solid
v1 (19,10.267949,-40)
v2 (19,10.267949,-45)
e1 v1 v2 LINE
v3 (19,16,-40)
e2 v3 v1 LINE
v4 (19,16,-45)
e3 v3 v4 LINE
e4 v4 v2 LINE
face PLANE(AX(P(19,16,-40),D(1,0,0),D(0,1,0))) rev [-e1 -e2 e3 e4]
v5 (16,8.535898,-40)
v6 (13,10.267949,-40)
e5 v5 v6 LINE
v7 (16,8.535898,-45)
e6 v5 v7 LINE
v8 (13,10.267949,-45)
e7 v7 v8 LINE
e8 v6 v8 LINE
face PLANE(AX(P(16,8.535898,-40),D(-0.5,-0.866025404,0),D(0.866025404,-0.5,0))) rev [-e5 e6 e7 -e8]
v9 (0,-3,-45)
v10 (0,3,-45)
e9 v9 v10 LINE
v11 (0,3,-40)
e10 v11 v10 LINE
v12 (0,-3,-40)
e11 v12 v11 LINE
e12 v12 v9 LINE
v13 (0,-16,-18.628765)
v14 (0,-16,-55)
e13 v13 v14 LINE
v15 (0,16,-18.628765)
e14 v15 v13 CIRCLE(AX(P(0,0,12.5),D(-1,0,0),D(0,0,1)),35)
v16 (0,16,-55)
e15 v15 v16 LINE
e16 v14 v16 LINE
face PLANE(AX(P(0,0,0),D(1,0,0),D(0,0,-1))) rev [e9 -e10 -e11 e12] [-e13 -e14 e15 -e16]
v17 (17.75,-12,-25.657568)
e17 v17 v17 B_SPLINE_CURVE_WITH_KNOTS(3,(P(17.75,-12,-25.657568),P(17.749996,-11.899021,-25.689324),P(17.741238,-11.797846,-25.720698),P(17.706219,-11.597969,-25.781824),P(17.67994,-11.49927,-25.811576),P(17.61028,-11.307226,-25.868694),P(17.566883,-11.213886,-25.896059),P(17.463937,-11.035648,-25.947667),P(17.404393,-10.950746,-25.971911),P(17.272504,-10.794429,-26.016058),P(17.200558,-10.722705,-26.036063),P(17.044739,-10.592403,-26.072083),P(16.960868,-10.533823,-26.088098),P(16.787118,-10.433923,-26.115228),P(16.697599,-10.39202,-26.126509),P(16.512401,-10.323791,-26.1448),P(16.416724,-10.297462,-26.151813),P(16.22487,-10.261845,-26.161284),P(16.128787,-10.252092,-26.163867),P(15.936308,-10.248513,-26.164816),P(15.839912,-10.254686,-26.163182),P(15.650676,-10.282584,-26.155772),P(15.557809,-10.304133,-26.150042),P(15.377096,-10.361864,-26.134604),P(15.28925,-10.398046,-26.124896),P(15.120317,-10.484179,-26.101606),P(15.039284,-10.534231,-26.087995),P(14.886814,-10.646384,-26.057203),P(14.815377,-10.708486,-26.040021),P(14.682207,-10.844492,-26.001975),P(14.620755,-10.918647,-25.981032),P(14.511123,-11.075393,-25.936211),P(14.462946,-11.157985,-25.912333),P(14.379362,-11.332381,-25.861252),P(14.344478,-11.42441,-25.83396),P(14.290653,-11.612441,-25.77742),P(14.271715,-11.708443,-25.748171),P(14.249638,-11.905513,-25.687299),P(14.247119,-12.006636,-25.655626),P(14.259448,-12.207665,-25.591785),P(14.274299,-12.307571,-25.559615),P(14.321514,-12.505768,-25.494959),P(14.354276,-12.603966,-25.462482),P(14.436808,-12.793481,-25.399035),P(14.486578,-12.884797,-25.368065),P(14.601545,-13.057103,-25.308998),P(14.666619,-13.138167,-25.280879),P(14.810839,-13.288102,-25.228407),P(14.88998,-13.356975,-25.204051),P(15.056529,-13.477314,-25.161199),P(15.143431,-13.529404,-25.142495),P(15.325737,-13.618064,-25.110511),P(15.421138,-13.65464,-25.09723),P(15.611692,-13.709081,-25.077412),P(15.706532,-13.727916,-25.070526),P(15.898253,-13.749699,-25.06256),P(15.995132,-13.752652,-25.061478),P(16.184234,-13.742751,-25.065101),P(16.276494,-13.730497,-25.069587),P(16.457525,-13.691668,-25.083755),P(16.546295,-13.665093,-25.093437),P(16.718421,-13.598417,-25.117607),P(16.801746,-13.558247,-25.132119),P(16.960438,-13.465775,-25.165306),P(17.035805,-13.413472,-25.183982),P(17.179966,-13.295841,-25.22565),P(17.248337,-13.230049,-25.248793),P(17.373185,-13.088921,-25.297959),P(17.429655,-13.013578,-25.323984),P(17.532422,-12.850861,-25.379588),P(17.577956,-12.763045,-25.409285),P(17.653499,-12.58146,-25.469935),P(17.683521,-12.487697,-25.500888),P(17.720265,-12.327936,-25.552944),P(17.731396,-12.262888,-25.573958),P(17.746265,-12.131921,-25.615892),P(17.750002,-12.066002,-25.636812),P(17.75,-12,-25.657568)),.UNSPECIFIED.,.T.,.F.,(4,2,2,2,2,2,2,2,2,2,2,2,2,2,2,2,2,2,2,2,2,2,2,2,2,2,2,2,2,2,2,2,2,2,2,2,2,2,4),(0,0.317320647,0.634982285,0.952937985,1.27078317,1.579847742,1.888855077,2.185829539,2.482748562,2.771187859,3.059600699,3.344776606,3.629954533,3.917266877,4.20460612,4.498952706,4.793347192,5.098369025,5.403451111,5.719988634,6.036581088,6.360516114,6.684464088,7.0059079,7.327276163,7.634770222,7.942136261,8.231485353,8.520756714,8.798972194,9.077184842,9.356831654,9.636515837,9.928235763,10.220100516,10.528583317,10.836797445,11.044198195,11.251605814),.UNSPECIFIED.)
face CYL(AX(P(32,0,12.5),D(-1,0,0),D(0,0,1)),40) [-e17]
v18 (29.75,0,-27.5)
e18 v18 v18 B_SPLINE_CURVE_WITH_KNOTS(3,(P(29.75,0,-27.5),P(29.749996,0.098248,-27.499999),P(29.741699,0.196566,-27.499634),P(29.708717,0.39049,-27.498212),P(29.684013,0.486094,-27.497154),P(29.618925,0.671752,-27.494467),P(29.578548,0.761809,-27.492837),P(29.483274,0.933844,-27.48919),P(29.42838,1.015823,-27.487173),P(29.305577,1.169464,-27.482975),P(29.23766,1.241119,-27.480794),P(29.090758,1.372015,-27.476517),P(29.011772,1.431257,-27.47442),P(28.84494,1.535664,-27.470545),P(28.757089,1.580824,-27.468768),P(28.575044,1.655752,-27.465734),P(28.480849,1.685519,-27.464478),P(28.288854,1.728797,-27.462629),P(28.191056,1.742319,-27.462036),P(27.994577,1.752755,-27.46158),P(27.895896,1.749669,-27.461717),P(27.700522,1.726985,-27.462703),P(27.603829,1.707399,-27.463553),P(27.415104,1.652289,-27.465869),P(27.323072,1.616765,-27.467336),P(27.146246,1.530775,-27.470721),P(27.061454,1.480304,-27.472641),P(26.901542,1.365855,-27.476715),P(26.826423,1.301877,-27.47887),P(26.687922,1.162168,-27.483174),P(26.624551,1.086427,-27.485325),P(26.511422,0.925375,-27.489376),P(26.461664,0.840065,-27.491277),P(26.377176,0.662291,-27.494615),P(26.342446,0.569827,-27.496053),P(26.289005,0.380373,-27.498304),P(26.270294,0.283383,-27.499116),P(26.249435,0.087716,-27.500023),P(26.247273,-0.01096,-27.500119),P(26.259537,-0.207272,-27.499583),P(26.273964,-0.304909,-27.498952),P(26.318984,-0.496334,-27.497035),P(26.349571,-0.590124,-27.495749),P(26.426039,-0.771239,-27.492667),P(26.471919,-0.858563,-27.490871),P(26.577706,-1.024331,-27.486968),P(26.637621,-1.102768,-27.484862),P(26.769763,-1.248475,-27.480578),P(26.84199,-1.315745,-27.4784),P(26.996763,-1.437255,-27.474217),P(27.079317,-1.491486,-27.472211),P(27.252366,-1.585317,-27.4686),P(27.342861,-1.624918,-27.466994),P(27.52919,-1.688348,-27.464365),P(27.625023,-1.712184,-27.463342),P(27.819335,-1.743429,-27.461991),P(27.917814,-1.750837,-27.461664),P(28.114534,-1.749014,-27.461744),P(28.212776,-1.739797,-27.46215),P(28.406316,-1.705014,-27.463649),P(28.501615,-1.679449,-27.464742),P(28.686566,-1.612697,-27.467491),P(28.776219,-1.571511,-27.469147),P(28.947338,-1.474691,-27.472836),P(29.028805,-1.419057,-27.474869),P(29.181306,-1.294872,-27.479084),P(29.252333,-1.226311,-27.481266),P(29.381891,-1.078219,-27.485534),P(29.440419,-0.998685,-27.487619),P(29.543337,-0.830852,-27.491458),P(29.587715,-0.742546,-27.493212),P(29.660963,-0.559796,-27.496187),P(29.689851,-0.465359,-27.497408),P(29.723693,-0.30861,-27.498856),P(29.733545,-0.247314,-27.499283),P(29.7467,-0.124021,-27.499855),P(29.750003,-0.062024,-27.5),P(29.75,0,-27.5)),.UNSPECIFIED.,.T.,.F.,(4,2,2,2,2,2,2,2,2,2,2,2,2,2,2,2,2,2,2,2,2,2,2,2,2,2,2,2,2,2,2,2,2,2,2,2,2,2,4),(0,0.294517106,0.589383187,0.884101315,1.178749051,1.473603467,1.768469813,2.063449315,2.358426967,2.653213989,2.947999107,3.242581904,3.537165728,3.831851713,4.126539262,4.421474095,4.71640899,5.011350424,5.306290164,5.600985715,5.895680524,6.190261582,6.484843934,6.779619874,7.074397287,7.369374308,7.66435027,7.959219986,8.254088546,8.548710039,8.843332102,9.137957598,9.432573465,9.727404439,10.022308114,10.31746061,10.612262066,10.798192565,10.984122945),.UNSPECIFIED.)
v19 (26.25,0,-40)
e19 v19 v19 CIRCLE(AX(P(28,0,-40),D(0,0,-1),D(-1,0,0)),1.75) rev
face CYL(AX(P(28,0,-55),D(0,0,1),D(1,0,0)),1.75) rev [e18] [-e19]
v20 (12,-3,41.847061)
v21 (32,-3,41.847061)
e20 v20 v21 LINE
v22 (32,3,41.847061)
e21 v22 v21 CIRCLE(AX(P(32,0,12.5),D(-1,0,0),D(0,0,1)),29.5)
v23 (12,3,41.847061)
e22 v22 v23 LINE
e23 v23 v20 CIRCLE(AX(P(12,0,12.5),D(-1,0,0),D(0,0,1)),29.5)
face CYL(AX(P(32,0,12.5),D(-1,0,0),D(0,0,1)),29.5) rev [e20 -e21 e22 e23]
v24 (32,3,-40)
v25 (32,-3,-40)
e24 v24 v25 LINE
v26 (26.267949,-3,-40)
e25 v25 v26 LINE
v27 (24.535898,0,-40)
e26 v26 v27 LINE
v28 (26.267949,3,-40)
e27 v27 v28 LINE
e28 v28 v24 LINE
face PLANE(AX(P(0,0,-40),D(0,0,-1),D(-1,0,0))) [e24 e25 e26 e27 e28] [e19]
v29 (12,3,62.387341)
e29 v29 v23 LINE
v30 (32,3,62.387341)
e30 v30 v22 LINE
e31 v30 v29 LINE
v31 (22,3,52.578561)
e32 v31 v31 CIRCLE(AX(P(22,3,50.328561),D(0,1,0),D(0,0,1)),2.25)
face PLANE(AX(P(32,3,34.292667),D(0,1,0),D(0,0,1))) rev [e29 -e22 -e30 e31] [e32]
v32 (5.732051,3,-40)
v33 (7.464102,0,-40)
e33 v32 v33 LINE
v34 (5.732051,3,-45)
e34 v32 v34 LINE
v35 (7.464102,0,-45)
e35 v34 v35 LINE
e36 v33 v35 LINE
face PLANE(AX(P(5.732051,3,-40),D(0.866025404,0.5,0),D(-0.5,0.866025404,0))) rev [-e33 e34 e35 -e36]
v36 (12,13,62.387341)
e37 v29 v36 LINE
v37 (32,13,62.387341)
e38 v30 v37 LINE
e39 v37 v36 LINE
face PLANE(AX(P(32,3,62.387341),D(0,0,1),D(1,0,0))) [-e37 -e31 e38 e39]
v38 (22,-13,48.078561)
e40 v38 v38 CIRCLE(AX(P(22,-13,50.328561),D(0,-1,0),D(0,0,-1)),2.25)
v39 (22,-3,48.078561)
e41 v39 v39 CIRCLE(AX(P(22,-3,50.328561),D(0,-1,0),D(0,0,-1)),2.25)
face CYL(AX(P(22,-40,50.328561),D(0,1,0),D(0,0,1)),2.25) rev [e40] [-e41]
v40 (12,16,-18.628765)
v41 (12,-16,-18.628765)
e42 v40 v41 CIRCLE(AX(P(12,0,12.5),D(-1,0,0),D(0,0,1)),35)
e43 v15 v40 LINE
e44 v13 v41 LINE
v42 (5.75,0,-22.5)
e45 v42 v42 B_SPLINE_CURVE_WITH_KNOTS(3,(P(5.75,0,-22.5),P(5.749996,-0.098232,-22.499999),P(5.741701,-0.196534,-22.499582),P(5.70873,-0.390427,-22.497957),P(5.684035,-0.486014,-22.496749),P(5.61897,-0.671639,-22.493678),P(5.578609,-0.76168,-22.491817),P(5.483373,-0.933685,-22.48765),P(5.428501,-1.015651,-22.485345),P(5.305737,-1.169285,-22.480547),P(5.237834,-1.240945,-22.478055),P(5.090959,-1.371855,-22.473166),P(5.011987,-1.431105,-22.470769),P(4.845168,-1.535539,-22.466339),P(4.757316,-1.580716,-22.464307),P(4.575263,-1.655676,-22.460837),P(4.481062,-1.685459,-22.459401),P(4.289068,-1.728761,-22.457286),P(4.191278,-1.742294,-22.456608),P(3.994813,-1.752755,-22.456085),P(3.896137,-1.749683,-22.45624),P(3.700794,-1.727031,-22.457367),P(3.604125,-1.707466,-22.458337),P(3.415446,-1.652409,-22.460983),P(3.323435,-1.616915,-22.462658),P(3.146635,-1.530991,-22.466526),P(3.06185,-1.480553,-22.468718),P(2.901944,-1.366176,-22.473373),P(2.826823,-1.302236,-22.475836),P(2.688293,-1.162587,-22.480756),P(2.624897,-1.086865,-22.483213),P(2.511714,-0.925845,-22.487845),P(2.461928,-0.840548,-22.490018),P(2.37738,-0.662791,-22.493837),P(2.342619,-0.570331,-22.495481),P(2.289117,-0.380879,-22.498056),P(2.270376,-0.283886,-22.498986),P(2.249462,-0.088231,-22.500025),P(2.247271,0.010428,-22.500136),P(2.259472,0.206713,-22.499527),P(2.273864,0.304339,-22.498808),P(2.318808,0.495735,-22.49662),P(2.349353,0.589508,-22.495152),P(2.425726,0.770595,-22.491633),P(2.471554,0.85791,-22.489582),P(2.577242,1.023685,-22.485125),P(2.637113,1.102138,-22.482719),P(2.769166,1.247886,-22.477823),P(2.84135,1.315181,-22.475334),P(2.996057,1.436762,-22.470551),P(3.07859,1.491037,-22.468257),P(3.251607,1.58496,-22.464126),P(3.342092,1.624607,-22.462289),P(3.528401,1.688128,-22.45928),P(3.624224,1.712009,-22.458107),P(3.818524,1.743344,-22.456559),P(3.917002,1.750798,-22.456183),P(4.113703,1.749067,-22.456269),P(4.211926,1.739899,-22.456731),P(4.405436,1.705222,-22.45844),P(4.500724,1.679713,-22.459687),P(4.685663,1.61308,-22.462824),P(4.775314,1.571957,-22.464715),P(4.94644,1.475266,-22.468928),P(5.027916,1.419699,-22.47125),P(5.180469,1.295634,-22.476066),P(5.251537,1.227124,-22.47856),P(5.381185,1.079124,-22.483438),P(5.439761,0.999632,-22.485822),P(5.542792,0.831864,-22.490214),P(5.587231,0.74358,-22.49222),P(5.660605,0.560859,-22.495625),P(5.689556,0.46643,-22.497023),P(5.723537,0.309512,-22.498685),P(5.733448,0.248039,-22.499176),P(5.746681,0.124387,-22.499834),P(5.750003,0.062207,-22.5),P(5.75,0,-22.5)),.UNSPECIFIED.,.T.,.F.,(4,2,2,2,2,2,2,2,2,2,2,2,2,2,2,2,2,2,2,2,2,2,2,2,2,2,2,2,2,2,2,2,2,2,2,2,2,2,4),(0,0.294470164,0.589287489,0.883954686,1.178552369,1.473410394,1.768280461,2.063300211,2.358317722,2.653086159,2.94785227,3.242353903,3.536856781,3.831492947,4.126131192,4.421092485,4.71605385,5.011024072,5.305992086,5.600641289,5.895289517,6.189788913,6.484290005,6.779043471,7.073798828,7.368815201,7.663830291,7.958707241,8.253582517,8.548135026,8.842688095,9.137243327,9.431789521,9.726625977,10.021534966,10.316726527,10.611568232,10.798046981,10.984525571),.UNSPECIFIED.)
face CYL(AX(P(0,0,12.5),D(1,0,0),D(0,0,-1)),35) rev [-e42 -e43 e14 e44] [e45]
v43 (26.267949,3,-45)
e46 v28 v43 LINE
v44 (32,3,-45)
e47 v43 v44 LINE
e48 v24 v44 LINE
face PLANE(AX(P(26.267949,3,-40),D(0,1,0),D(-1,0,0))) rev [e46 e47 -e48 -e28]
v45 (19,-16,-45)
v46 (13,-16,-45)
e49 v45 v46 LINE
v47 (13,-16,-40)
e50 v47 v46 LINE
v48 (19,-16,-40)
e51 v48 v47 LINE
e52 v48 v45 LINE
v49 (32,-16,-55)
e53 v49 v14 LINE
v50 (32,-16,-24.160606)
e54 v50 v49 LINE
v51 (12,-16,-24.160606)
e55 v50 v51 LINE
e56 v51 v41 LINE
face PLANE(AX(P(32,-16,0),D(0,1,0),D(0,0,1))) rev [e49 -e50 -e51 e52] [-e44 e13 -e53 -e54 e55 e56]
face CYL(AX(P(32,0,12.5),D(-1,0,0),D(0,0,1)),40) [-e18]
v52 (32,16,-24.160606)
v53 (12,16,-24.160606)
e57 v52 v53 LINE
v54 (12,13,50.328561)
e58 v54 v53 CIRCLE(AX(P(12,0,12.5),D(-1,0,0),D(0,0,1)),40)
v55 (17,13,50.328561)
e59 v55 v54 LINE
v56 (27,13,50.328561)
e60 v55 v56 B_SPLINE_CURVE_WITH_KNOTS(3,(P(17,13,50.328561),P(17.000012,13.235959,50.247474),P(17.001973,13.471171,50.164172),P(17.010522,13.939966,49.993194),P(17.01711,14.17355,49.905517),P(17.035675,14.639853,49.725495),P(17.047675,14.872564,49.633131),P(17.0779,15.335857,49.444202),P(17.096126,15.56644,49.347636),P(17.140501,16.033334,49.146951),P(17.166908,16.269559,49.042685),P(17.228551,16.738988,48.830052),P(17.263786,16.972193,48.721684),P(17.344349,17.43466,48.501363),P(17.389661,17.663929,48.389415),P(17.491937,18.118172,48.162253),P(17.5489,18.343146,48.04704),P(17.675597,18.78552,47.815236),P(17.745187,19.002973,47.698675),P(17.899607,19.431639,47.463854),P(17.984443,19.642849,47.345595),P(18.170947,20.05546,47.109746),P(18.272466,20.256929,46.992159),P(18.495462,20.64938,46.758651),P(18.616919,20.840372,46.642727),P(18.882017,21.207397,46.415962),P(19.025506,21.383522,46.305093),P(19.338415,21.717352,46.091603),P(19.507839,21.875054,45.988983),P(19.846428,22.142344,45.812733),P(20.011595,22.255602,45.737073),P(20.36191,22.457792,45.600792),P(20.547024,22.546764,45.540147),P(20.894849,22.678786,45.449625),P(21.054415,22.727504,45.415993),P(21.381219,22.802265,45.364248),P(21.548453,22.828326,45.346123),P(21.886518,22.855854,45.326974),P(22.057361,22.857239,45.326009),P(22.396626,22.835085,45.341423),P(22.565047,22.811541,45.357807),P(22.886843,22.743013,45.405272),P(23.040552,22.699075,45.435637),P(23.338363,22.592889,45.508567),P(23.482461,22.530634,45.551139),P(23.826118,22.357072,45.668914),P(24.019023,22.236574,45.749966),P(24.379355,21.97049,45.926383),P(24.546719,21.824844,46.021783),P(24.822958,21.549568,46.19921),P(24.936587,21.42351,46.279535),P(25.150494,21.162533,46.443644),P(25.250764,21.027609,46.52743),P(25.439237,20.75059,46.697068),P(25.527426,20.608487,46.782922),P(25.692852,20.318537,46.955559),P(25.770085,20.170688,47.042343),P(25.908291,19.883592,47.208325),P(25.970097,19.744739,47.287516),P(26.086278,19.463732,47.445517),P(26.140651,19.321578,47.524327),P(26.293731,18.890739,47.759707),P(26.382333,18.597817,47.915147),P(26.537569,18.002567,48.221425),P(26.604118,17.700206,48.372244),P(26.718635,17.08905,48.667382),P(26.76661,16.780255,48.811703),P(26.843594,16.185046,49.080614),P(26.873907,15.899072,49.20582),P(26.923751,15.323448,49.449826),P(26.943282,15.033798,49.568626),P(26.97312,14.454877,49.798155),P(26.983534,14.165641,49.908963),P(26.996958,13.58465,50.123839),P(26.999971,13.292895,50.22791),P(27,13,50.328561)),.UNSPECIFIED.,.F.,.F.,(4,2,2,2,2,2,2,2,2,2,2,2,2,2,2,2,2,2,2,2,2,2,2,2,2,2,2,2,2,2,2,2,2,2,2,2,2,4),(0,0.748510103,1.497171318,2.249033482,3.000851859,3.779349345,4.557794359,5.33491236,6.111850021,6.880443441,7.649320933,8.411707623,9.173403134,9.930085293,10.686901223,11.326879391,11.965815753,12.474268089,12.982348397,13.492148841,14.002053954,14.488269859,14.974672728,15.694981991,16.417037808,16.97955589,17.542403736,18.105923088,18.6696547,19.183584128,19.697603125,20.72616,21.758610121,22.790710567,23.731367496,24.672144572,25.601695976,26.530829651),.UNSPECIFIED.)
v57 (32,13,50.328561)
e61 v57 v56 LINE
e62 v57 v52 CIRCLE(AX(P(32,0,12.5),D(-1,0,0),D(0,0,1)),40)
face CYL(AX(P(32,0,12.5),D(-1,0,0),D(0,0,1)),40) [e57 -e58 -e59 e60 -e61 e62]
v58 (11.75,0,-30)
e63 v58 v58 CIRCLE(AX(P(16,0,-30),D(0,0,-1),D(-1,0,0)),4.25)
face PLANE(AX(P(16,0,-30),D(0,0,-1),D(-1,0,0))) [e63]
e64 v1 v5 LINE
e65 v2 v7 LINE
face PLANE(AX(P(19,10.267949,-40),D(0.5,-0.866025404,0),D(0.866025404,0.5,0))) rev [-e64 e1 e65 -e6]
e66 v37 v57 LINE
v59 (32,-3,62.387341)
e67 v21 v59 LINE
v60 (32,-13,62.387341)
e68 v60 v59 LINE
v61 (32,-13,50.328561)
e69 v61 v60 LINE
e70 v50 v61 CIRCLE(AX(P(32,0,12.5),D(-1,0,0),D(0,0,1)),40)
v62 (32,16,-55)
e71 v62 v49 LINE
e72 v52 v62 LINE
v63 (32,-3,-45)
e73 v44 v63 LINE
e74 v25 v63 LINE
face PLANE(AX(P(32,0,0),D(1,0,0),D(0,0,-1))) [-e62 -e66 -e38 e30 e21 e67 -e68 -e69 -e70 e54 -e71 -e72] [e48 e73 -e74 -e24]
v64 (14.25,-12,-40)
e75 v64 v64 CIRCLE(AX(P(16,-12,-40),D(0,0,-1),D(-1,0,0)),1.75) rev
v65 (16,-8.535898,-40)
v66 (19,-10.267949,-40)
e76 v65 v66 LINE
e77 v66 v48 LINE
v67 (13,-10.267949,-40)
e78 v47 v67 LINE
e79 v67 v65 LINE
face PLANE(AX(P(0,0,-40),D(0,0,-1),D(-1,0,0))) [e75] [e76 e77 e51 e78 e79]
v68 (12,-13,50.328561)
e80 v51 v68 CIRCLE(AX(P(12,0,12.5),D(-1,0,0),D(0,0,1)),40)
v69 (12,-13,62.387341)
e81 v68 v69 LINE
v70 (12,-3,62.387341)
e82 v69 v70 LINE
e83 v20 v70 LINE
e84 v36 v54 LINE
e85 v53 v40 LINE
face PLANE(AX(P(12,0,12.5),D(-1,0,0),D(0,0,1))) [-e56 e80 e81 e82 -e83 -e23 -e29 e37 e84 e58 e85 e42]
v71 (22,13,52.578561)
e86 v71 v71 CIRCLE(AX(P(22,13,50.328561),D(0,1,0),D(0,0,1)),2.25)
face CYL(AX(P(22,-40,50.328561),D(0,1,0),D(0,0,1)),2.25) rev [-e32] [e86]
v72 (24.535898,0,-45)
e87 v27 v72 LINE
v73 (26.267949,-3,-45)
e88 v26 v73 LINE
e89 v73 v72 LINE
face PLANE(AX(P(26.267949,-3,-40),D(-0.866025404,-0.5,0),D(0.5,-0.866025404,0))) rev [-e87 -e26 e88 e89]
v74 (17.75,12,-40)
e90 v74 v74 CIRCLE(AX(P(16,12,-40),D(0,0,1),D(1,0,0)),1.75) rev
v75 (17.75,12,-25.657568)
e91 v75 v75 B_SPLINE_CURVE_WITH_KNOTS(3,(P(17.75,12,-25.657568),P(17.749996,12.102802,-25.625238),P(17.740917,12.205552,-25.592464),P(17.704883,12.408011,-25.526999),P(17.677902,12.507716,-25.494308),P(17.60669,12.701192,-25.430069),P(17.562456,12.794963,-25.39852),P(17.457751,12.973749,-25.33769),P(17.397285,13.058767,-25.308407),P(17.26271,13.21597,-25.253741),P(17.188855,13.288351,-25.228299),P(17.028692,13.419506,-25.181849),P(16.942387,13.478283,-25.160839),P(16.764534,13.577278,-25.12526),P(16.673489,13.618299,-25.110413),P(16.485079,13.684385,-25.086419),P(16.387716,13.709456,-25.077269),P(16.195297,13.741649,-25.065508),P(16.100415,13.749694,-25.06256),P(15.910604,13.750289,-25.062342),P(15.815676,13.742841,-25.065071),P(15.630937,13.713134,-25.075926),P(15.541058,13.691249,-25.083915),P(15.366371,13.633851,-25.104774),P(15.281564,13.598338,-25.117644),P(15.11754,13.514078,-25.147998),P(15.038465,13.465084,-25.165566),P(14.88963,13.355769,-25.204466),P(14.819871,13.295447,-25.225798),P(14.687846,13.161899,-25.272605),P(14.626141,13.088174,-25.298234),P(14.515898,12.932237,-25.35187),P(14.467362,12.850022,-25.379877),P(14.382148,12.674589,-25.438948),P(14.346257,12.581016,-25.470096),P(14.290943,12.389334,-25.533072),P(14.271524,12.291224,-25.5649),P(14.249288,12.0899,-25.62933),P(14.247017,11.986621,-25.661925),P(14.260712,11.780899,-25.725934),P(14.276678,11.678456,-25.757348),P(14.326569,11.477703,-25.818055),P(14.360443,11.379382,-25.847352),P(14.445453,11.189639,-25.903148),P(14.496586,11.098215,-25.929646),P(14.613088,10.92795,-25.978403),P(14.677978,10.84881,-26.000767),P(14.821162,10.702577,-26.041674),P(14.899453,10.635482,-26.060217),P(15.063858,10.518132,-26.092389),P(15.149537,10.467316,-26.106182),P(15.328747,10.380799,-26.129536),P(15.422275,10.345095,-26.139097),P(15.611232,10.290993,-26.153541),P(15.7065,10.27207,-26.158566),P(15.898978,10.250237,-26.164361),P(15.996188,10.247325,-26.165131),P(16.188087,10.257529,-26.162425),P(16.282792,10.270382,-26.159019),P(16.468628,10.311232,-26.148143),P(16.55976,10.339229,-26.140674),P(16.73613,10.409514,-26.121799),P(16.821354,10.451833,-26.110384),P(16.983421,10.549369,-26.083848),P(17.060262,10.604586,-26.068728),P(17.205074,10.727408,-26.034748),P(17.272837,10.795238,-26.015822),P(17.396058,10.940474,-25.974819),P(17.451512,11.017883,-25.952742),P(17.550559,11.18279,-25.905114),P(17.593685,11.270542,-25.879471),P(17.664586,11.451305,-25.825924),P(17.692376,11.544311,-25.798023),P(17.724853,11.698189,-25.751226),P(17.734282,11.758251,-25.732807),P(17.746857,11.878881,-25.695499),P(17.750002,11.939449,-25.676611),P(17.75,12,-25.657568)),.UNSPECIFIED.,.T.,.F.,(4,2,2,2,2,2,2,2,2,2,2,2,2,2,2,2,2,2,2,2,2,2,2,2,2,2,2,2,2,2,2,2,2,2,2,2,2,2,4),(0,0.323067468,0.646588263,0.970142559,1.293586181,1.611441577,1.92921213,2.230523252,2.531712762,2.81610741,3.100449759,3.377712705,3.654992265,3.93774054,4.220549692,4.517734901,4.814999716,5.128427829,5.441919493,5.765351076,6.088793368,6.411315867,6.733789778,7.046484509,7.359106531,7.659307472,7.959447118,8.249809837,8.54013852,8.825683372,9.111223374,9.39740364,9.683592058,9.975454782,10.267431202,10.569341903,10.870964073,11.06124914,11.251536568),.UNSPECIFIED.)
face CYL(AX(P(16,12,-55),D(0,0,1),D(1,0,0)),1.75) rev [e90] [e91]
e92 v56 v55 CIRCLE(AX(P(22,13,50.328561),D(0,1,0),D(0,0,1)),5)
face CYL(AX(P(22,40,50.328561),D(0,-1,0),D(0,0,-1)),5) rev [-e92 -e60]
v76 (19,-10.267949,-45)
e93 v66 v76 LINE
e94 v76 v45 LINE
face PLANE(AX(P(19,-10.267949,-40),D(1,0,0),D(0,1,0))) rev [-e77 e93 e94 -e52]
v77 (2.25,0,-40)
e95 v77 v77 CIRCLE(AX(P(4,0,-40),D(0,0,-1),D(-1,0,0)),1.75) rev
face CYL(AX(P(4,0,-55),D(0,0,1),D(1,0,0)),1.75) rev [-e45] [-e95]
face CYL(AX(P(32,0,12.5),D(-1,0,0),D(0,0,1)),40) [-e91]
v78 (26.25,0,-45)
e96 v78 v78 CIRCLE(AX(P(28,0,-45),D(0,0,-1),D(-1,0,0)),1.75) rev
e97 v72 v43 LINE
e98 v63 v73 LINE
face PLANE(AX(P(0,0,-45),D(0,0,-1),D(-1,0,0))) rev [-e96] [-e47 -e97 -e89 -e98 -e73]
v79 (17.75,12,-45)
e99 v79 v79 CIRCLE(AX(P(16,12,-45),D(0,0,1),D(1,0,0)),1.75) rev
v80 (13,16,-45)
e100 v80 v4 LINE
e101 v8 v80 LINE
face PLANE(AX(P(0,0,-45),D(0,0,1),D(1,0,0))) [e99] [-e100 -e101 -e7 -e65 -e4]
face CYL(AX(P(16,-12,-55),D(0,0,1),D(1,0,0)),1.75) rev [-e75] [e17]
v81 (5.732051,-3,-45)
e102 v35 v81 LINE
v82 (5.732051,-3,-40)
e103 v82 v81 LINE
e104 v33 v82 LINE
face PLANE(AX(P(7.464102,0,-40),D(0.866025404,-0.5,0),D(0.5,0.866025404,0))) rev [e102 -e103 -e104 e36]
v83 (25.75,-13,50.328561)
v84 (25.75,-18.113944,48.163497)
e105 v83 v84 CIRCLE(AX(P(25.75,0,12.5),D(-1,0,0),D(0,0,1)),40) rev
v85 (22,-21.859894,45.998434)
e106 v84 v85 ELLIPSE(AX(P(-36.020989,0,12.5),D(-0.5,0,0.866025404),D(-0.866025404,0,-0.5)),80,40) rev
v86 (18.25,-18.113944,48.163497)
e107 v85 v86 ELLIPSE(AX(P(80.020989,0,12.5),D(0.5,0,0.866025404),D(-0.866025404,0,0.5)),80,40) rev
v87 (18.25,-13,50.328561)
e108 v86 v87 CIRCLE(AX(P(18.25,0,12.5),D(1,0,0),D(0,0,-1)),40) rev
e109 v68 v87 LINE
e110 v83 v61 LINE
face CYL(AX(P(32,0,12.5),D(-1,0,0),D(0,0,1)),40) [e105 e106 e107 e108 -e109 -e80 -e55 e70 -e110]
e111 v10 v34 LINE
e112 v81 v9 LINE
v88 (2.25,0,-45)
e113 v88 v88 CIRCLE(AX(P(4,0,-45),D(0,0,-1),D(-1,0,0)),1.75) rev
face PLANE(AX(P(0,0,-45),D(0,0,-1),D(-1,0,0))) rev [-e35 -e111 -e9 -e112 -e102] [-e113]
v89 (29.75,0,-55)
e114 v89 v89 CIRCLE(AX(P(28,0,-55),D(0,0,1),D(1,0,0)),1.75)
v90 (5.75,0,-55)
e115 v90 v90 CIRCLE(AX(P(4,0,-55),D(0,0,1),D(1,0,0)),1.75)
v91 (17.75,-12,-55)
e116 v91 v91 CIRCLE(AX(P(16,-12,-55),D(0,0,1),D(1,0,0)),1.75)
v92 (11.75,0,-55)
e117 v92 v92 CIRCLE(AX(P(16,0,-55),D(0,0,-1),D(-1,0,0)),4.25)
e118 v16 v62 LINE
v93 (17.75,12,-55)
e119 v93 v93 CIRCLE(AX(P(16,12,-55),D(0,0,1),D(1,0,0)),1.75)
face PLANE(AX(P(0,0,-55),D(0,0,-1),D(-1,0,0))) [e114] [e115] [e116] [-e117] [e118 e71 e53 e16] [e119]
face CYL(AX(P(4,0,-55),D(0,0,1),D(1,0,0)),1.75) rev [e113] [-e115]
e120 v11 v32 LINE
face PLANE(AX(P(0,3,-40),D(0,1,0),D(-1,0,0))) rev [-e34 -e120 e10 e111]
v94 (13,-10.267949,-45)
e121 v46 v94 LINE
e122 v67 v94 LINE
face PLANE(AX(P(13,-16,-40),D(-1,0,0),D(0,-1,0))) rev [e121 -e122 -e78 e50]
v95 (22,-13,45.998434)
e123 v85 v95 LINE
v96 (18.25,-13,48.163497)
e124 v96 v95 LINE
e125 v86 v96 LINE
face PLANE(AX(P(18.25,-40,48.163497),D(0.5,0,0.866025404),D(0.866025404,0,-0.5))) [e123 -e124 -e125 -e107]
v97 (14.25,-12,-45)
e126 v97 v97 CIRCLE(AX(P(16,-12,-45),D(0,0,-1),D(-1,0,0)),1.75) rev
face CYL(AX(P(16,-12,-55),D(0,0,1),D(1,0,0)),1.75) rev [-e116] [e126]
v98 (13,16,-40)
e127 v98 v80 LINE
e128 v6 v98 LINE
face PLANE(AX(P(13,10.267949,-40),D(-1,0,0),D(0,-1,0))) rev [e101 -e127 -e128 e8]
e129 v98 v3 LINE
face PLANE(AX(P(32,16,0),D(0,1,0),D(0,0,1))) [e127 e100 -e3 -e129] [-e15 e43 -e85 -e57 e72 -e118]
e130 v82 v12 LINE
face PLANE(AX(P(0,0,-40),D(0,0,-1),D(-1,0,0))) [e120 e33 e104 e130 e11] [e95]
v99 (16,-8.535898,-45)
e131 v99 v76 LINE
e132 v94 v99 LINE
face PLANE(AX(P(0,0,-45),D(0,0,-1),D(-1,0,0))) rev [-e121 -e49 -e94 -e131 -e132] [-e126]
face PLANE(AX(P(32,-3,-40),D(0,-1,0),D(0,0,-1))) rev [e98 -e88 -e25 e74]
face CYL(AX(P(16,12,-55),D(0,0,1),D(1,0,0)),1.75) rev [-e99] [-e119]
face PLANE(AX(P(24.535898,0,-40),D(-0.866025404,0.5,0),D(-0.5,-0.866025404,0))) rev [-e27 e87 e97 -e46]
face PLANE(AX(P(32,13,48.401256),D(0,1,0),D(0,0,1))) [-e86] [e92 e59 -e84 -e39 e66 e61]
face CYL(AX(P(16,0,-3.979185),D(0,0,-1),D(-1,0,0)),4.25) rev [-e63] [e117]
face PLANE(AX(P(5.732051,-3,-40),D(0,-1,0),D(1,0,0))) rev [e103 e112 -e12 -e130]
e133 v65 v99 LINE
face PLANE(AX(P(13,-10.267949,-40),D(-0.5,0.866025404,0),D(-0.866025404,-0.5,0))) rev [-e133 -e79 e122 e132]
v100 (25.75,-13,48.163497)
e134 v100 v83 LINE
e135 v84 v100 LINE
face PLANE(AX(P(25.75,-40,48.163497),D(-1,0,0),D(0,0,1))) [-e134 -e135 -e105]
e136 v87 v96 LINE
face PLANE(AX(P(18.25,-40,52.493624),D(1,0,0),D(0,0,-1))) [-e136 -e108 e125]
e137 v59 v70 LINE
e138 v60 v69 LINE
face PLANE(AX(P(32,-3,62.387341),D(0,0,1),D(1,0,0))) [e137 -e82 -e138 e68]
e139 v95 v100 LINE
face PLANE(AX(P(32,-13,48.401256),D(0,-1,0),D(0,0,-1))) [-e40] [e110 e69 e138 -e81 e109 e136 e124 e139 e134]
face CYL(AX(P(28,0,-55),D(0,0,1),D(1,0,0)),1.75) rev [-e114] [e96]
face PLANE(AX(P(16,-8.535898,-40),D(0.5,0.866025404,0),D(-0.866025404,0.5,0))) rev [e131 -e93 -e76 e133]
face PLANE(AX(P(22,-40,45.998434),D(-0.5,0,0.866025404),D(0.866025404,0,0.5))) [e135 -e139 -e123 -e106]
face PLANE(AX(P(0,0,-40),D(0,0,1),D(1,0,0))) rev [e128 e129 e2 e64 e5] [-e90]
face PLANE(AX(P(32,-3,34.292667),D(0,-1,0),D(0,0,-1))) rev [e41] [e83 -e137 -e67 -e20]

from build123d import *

# Parameters (mm, degrees)
BOSS_EXTRUDE1_DEPTH       = 32
SKETCH4_R                 = 16
CUT_EXTRUDE3_DEPTH        = 15
SKETCH5_R                 = 7
SKETCH5_R_2               = 4
BOSS_EXTRUDE2_DEPTH       = 17
SKETCH15_W                = 16
SKETCH15_H                = 32
CUT_EXTRUDE6_DEPTH        = 15
SKETCH16_W                = 32
SKETCH16_H                = 32
BOSS_EXTRUDE6_DEPTH       = 30
SKETCH17_R                = 1.75
CUT_EXTRUDE8_DEPTH        = 53.92447449
CUT_EXTRUDE10_START       = -10
CUT_EXTRUDE10_DEPTH       = 5
SKETCH20_R                = 4.25
CUT_EXTRUDE11_DEPTH       = 39
CUT_EXTRUDE12_DEPTH       = 10
SKETCH22_R                = 6.5
CUT_EXTRUDE13_DEPTH       = 10
SKETCH23_R                = 1.75
CUT_EXTRUDE14_DEPTH       = 10
CUT_EXTRUDE16_REACH       = 64.498
SKETCH24_R                = 22.5
BOSS_EXTRUDE7_START       = 11.749999897
BOSS_EXTRUDE7_DEPTH       = 8.500000103
SKETCH26_R                = 8.5
CUT_EXTRUDE17_DEPTH       = 10
SKETCH27_R                = 16
BOSS_EXTRUDE8_DEPTH       = 7
SKETCH28_R                = 35
CUT_EXTRUDE18_DEPTH       = 63.498000008
BOSS_EXTRUDE9_START       = -7
SKETCH29_R                = 35
BOSS_EXTRUDE9_DEPTH       = 7
BOSS_EXTRUDE10_DEPTH      = 3
SKETCH31_R                = 15
CUT_EXTRUDE19_DEPTH       = 69.804069679
SKETCH32_R                = 2.2
CUT_EXTRUDE20_DEPTH       = 69.804069679
BOSS_EXTRUDE11_DEPTH      = 10
BOSS_EXTRUDE11_DEPTH_BACK = 10
SKETCH33_R                = 40
SKETCH33_R_2              = 29.5
CUT_EXTRUDE21_START       = -10
SKETCH34_R                = 29.5
CUT_EXTRUDE21_DEPTH       = 10
SKETCH35_W                = 26.144944591
SKETCH35_H                = 6
CUT_EXTRUDE22_DEPTH       = 71.887234394
SKETCH36_W                = 13.986084995
SKETCH36_H                = 10
BOSS_EXTRUDE12_DEPTH      = 20
CUT_EXTRUDE23_DEPTH       = 88.893005187
CUT_EXTRUDE23_DEPTH_BACK  = 88.893005187
SKETCH37_R                = 2.25
SKETCH38_R                = 5
CUT_EXTRUDE24_DEPTH       = 88.893005284
CUT_EXTRUDE25_DEPTH       = 88.893005284


# Read off the part's stored shape, not the designer's step: Boss-Extrude7
with BuildPart() as part:
    # Sketch1 → Boss-Extrude1 (new body)
    with BuildSketch(Plane(origin=(0, 0, 0), x_dir=(0, -1, 0), z_dir=(1, 0, 0))):
        with BuildLine():
            ThreePointArc((-16, 0), (0, 16), (16, 0))
            Line((16, 0), (16, 25))
            Line((16, 25), (-16, 25))
            Line((-16, 25), (-16, 0))
        make_face()
        with BuildLine():
            ThreePointArc((-4.5, 0), (0, 4.5), (4.5, 0))
            Line((4.5, 0), (16, 0))
            ThreePointArc((16, 0), (0, 16), (-16, 0))
            Line((-16, 0), (-4.5, 0))
        make_face()
        with BuildLine():
            Line((16, 0), (4.5, 0))
            ThreePointArc((4.5, 0), (0, -4.5), (-4.5, 0))
            Line((-4.5, 0), (-16, 0))
            ThreePointArc((-16, 0), (0, -16), (16, 0))
        make_face()
        with BuildLine():
            ThreePointArc((-4.5, 0), (0, 4.5), (4.5, 0))
            Line((4.5, 0), (16, 0))
            ThreePointArc((16, 0), (0, 16), (-16, 0))
            Line((-16, 0), (-4.5, 0))
        make_face()
        with BuildLine():
            Line((16, 0), (4.5, 0))
            ThreePointArc((4.5, 0), (0, -4.5), (-4.5, 0))
            Line((-4.5, 0), (-16, 0))
            ThreePointArc((-16, 0), (0, -16), (16, 0))
        make_face()
    extrude(amount=BOSS_EXTRUDE1_DEPTH)

    # Sketch4 → Cut-Extrude3 (cut)
    with BuildSketch(Plane.ZY):
        Circle(SKETCH4_R)
    extrude(amount=-CUT_EXTRUDE3_DEPTH, mode=Mode.SUBTRACT)

    # Sketch5 → Boss-Extrude2 (add)
    with BuildSketch(Plane.ZY.offset(-15)):
        Circle(SKETCH5_R)
        Circle(SKETCH5_R_2, mode=Mode.SUBTRACT)
    extrude(amount=-BOSS_EXTRUDE2_DEPTH)

    # Sketch15 → Cut-Extrude6 (cut)
    with BuildSketch(Plane.ZY):
        with Locations((-8, 0)):
            Rectangle(SKETCH15_W, SKETCH15_H)
    extrude(amount=-CUT_EXTRUDE6_DEPTH, mode=Mode.SUBTRACT)

    # Sketch16 → Boss-Extrude6 (add)
    with BuildSketch(Plane(origin=(0, 0, -25), x_dir=(-1, 0, 0), z_dir=(0, 0, -1))):
        with Locations((-16, 0)):
            Rectangle(SKETCH16_W, SKETCH16_H)
    extrude(amount=BOSS_EXTRUDE6_DEPTH)

    # Sketch17 → Cut-Extrude8 (cut, through all)
    with BuildSketch(Plane.XY.offset(-16)):
        with Locations((4, 0)):
            Circle(SKETCH17_R)
        with Locations((16, 12)):
            Circle(SKETCH17_R)
        with Locations((28, 0)):
            Circle(SKETCH17_R)
        with Locations((16, -12)):
            Circle(SKETCH17_R)
    extrude(amount=-CUT_EXTRUDE8_DEPTH, mode=Mode.SUBTRACT)

    # Sketch19 → Cut-Extrude10 (cut)
    with BuildSketch(Plane(origin=(0, 0, -55), x_dir=(-1, 0, 0), z_dir=(0, 0, -1)).offset(CUT_EXTRUDE10_START)):
        Polygon((0, 3), (-5.732050808, 3), (-7.464101615, 0), (-5.732050808, -3), (0, -3), align=None)
        Polygon((-16, -8.535898385), (-19, -10.267949192), (-19, -16), (-13, -16), (-13, -10.267949192), align=None)
        Polygon((-24.535898385, 0), (-26.267949192, 3), (-32, 3), (-32, -3), (-26.267949192, -3), align=None)
        Polygon((-16, 8.535898385), (-13, 10.267949192), (-13, 16), (-19, 16), (-19, 10.267949192), align=None)
    extrude(amount=-CUT_EXTRUDE10_DEPTH, mode=Mode.SUBTRACT)

    # Sketch20 → Cut-Extrude11 (cut)
    with BuildSketch(Plane(origin=(0, 0, -55), x_dir=(-1, 0, 0), z_dir=(0, 0, -1))):
        with Locations((-16, 0)):
            Circle(SKETCH20_R)
    extrude(amount=-CUT_EXTRUDE11_DEPTH, mode=Mode.SUBTRACT)

    # Sketch21 → Cut-Extrude12 (cut)
    with BuildSketch(Plane.ZY.offset(-15)):
        with BuildLine():
            Line((0, 16), (-16, 16))
            Line((-16, 16), (-16, 13.436140662))
            Line((-16, 13.436140662), (-16, 10.563859338))
            Line((-16, 10.563859338), (-16, 4.13067791))
            Line((-16, 4.13067791), (-16, -4.13067791))
            Line((-16, -4.13067791), (-16, -10.563859338))
            Line((-16, -10.563859338), (-16, -13.436140662))
            Line((-16, -13.436140662), (-16, -16))
            Line((-16, -16), (0, -16))
            ThreePointArc((0, -16), (16, 0), (0, 16))
        make_face()
    extrude(amount=-CUT_EXTRUDE12_DEPTH, mode=Mode.SUBTRACT)

    # Sketch22 → Cut-Extrude13 (cut)
    with BuildSketch(Plane.ZY.offset(-25)):
        Circle(SKETCH22_R)
    extrude(amount=-CUT_EXTRUDE13_DEPTH, mode=Mode.SUBTRACT)

    # Sketch23 → Cut-Extrude14 (cut)
    with BuildSketch(Plane.ZY.offset(-25)):
        with Locations((0, 12.5)):
            Circle(SKETCH23_R)
        with Locations((0, -12.5)):
            Circle(SKETCH23_R)
    extrude(amount=-CUT_EXTRUDE14_DEPTH, mode=Mode.SUBTRACT)

    # Cut-Extrude16: up to this face of the body (flat: up to its plane)
    cut_extrude16_end = Plane(part.part.faces().sort_by_distance((0, 0, -35.327586207))[0])
    # Sketch24 → Cut-Extrude16 (cut, up to the picked face)
    with BuildSketch(Plane.ZY.offset(-25), mode=Mode.PRIVATE) as cut_extrude16_sk1:
        Circle(SKETCH24_R)
    cut_extrude16_tool1 = split(extrude(cut_extrude16_sk1.sketch, amount=CUT_EXTRUDE16_REACH, mode=Mode.PRIVATE), bisect_by=cut_extrude16_end, keep=Keep.BOTH, mode=Mode.PRIVATE)
    add(cut_extrude16_tool1.solids().sort_by(Axis((25, 0, 0), (-1, 0, 0)))[0], mode=Mode.SUBTRACT)

    # Boss-Extrude7 outline → Boss-Extrude7 (add)
    with BuildSketch(Plane.YZ.offset(BOSS_EXTRUDE7_START)):
        with BuildLine():
            ThreePointArc((6, -21.685248442), (0, -22.5), (-6, -21.685248442))
            Line((-6, -21.685248442), (-6, -30))
            Line((-6, -30), (6, -30))
            Line((6, -30), (6, -21.685248442))
        make_face()
    extrude(amount=BOSS_EXTRUDE7_DEPTH)

    # Sketch26 → Cut-Extrude17 (cut)
    with BuildSketch(Plane.ZY.offset(-25)):
        Circle(SKETCH26_R)
    extrude(amount=-CUT_EXTRUDE17_DEPTH, mode=Mode.SUBTRACT)

    # Sketch27 → Boss-Extrude8 (add)
    with BuildSketch(Plane.ZY.offset(-25)):
        Circle(SKETCH27_R)
    extrude(amount=-BOSS_EXTRUDE8_DEPTH)

    # Sketch28 → Cut-Extrude18 (cut, through all)
    with BuildSketch(Plane.ZY.offset(-25)):
        with Locations((12.5, 0)):
            Circle(SKETCH28_R)
    extrude(amount=CUT_EXTRUDE18_DEPTH, mode=Mode.SUBTRACT)

    # Sketch29 → Boss-Extrude9 (add)
    with BuildSketch(Plane.ZY.offset(-25).offset(BOSS_EXTRUDE9_START)):
        with Locations((12.5, 0)):
            Circle(SKETCH29_R)
    extrude(amount=BOSS_EXTRUDE9_DEPTH)

    # Sketch30 → Boss-Extrude10 (add)
    with BuildSketch(Plane.ZY.offset(-25)):
        with BuildLine():
            ThreePointArc((-18.628764833, -16), (47.5, 0), (-18.628764833, 16))
            ThreePointArc((-18.628764833, 16), (-22.5, 0), (-18.628764833, -16))
        make_face()
    extrude(amount=BOSS_EXTRUDE10_DEPTH)

    # Sketch31 → Cut-Extrude19 (cut, through all)
    with BuildSketch(Plane.ZY.offset(-22)):
        with Locations((12.5, 0)):
            Circle(SKETCH31_R)
    extrude(amount=-CUT_EXTRUDE19_DEPTH, mode=Mode.SUBTRACT)

    # Sketch32 → Cut-Extrude20 (cut, through all)
    with BuildSketch(Plane.ZY.offset(-22)):
        with Locations((12.52327174, 25.399989339)):
            Circle(SKETCH32_R)
        with Locations((-5.444049099, 17.976960309)):
            Circle(SKETCH32_R)
        with Locations((-12.899989339, 0.02327174)):
            Circle(SKETCH32_R)
        with Locations((-5.476960309, -17.944049099)):
            Circle(SKETCH32_R)
        with Locations((12.47672826, -25.399989339)):
            Circle(SKETCH32_R)
        with Locations((30.444049099, -17.976960309)):
            Circle(SKETCH32_R)
        with Locations((30.476960309, 17.944049099)):
            Circle(SKETCH32_R)
    extrude(amount=-CUT_EXTRUDE20_DEPTH, mode=Mode.SUBTRACT)

    # Sketch33 → Boss-Extrude11 (add, two sides: drawn at the far end of the back side and taken through both)
    with BuildSketch(Plane.ZY.offset(-22).offset(-BOSS_EXTRUDE11_DEPTH_BACK)):
        with Locations((12.5, 0)):
            Circle(SKETCH33_R)
        with Locations((12.5, 0)):
            Circle(SKETCH33_R_2, mode=Mode.SUBTRACT)
    extrude(amount=BOSS_EXTRUDE11_DEPTH + BOSS_EXTRUDE11_DEPTH_BACK)

    # Sketch34 → Cut-Extrude21 (cut)
    with BuildSketch(Plane.ZY.offset(-22).offset(CUT_EXTRUDE21_START)):
        with Locations((12.5, 0)):
            Circle(SKETCH34_R)
    extrude(amount=CUT_EXTRUDE21_DEPTH, mode=Mode.SUBTRACT)

    # Sketch35 → Cut-Extrude22 (cut, through all)
    with BuildSketch(Plane.ZY.offset(-12)):
        with Locations((47.365138907, 0)):
            Rectangle(SKETCH35_W, SKETCH35_H)
    extrude(amount=-CUT_EXTRUDE22_DEPTH, mode=Mode.SUBTRACT)

    # Sketch36 → Boss-Extrude12 (add)
    with BuildSketch(Plane.ZY.offset(-12)):
        with Locations((55.394298853, 8)):
            Rectangle(SKETCH36_W, SKETCH36_H)
        with Locations((55.394298853, -8)):
            Rectangle(SKETCH36_W, SKETCH36_H)
    extrude(amount=-BOSS_EXTRUDE12_DEPTH)

    # Sketch37 → Cut-Extrude23 (cut, two sides: drawn at the far end of the back side and taken through both)
    with BuildSketch(Plane(origin=(0, 13, 0), x_dir=(1, 0, 0), z_dir=(0, 1, 0)).offset(-CUT_EXTRUDE23_DEPTH_BACK)):
        with Locations((22, -50.328560639)):
            Circle(SKETCH37_R)
    extrude(amount=CUT_EXTRUDE23_DEPTH + CUT_EXTRUDE23_DEPTH_BACK, mode=Mode.SUBTRACT)

    # Sketch38 → Cut-Extrude24 (cut, through all)
    with BuildSketch(Plane(origin=(0, 13, 0), x_dir=(1, 0, 0), z_dir=(0, 1, 0))):
        with Locations((22, -50.328560639)):
            Circle(SKETCH38_R)
    extrude(amount=CUT_EXTRUDE24_DEPTH, mode=Mode.SUBTRACT)

    # Sketch39 → Cut-Extrude25 (cut, through all)
    with BuildSketch(Plane.XZ.offset(13)):
        Polygon((25.75, 52.493624148), (22, 54.658687658), (18.25, 52.493624148), (18.25, 48.163497129), (22, 45.99843362), (25.75, 48.163497129), align=None)
    extrude(amount=CUT_EXTRUDE25_DEPTH, mode=Mode.SUBTRACT)


solid = part.part
